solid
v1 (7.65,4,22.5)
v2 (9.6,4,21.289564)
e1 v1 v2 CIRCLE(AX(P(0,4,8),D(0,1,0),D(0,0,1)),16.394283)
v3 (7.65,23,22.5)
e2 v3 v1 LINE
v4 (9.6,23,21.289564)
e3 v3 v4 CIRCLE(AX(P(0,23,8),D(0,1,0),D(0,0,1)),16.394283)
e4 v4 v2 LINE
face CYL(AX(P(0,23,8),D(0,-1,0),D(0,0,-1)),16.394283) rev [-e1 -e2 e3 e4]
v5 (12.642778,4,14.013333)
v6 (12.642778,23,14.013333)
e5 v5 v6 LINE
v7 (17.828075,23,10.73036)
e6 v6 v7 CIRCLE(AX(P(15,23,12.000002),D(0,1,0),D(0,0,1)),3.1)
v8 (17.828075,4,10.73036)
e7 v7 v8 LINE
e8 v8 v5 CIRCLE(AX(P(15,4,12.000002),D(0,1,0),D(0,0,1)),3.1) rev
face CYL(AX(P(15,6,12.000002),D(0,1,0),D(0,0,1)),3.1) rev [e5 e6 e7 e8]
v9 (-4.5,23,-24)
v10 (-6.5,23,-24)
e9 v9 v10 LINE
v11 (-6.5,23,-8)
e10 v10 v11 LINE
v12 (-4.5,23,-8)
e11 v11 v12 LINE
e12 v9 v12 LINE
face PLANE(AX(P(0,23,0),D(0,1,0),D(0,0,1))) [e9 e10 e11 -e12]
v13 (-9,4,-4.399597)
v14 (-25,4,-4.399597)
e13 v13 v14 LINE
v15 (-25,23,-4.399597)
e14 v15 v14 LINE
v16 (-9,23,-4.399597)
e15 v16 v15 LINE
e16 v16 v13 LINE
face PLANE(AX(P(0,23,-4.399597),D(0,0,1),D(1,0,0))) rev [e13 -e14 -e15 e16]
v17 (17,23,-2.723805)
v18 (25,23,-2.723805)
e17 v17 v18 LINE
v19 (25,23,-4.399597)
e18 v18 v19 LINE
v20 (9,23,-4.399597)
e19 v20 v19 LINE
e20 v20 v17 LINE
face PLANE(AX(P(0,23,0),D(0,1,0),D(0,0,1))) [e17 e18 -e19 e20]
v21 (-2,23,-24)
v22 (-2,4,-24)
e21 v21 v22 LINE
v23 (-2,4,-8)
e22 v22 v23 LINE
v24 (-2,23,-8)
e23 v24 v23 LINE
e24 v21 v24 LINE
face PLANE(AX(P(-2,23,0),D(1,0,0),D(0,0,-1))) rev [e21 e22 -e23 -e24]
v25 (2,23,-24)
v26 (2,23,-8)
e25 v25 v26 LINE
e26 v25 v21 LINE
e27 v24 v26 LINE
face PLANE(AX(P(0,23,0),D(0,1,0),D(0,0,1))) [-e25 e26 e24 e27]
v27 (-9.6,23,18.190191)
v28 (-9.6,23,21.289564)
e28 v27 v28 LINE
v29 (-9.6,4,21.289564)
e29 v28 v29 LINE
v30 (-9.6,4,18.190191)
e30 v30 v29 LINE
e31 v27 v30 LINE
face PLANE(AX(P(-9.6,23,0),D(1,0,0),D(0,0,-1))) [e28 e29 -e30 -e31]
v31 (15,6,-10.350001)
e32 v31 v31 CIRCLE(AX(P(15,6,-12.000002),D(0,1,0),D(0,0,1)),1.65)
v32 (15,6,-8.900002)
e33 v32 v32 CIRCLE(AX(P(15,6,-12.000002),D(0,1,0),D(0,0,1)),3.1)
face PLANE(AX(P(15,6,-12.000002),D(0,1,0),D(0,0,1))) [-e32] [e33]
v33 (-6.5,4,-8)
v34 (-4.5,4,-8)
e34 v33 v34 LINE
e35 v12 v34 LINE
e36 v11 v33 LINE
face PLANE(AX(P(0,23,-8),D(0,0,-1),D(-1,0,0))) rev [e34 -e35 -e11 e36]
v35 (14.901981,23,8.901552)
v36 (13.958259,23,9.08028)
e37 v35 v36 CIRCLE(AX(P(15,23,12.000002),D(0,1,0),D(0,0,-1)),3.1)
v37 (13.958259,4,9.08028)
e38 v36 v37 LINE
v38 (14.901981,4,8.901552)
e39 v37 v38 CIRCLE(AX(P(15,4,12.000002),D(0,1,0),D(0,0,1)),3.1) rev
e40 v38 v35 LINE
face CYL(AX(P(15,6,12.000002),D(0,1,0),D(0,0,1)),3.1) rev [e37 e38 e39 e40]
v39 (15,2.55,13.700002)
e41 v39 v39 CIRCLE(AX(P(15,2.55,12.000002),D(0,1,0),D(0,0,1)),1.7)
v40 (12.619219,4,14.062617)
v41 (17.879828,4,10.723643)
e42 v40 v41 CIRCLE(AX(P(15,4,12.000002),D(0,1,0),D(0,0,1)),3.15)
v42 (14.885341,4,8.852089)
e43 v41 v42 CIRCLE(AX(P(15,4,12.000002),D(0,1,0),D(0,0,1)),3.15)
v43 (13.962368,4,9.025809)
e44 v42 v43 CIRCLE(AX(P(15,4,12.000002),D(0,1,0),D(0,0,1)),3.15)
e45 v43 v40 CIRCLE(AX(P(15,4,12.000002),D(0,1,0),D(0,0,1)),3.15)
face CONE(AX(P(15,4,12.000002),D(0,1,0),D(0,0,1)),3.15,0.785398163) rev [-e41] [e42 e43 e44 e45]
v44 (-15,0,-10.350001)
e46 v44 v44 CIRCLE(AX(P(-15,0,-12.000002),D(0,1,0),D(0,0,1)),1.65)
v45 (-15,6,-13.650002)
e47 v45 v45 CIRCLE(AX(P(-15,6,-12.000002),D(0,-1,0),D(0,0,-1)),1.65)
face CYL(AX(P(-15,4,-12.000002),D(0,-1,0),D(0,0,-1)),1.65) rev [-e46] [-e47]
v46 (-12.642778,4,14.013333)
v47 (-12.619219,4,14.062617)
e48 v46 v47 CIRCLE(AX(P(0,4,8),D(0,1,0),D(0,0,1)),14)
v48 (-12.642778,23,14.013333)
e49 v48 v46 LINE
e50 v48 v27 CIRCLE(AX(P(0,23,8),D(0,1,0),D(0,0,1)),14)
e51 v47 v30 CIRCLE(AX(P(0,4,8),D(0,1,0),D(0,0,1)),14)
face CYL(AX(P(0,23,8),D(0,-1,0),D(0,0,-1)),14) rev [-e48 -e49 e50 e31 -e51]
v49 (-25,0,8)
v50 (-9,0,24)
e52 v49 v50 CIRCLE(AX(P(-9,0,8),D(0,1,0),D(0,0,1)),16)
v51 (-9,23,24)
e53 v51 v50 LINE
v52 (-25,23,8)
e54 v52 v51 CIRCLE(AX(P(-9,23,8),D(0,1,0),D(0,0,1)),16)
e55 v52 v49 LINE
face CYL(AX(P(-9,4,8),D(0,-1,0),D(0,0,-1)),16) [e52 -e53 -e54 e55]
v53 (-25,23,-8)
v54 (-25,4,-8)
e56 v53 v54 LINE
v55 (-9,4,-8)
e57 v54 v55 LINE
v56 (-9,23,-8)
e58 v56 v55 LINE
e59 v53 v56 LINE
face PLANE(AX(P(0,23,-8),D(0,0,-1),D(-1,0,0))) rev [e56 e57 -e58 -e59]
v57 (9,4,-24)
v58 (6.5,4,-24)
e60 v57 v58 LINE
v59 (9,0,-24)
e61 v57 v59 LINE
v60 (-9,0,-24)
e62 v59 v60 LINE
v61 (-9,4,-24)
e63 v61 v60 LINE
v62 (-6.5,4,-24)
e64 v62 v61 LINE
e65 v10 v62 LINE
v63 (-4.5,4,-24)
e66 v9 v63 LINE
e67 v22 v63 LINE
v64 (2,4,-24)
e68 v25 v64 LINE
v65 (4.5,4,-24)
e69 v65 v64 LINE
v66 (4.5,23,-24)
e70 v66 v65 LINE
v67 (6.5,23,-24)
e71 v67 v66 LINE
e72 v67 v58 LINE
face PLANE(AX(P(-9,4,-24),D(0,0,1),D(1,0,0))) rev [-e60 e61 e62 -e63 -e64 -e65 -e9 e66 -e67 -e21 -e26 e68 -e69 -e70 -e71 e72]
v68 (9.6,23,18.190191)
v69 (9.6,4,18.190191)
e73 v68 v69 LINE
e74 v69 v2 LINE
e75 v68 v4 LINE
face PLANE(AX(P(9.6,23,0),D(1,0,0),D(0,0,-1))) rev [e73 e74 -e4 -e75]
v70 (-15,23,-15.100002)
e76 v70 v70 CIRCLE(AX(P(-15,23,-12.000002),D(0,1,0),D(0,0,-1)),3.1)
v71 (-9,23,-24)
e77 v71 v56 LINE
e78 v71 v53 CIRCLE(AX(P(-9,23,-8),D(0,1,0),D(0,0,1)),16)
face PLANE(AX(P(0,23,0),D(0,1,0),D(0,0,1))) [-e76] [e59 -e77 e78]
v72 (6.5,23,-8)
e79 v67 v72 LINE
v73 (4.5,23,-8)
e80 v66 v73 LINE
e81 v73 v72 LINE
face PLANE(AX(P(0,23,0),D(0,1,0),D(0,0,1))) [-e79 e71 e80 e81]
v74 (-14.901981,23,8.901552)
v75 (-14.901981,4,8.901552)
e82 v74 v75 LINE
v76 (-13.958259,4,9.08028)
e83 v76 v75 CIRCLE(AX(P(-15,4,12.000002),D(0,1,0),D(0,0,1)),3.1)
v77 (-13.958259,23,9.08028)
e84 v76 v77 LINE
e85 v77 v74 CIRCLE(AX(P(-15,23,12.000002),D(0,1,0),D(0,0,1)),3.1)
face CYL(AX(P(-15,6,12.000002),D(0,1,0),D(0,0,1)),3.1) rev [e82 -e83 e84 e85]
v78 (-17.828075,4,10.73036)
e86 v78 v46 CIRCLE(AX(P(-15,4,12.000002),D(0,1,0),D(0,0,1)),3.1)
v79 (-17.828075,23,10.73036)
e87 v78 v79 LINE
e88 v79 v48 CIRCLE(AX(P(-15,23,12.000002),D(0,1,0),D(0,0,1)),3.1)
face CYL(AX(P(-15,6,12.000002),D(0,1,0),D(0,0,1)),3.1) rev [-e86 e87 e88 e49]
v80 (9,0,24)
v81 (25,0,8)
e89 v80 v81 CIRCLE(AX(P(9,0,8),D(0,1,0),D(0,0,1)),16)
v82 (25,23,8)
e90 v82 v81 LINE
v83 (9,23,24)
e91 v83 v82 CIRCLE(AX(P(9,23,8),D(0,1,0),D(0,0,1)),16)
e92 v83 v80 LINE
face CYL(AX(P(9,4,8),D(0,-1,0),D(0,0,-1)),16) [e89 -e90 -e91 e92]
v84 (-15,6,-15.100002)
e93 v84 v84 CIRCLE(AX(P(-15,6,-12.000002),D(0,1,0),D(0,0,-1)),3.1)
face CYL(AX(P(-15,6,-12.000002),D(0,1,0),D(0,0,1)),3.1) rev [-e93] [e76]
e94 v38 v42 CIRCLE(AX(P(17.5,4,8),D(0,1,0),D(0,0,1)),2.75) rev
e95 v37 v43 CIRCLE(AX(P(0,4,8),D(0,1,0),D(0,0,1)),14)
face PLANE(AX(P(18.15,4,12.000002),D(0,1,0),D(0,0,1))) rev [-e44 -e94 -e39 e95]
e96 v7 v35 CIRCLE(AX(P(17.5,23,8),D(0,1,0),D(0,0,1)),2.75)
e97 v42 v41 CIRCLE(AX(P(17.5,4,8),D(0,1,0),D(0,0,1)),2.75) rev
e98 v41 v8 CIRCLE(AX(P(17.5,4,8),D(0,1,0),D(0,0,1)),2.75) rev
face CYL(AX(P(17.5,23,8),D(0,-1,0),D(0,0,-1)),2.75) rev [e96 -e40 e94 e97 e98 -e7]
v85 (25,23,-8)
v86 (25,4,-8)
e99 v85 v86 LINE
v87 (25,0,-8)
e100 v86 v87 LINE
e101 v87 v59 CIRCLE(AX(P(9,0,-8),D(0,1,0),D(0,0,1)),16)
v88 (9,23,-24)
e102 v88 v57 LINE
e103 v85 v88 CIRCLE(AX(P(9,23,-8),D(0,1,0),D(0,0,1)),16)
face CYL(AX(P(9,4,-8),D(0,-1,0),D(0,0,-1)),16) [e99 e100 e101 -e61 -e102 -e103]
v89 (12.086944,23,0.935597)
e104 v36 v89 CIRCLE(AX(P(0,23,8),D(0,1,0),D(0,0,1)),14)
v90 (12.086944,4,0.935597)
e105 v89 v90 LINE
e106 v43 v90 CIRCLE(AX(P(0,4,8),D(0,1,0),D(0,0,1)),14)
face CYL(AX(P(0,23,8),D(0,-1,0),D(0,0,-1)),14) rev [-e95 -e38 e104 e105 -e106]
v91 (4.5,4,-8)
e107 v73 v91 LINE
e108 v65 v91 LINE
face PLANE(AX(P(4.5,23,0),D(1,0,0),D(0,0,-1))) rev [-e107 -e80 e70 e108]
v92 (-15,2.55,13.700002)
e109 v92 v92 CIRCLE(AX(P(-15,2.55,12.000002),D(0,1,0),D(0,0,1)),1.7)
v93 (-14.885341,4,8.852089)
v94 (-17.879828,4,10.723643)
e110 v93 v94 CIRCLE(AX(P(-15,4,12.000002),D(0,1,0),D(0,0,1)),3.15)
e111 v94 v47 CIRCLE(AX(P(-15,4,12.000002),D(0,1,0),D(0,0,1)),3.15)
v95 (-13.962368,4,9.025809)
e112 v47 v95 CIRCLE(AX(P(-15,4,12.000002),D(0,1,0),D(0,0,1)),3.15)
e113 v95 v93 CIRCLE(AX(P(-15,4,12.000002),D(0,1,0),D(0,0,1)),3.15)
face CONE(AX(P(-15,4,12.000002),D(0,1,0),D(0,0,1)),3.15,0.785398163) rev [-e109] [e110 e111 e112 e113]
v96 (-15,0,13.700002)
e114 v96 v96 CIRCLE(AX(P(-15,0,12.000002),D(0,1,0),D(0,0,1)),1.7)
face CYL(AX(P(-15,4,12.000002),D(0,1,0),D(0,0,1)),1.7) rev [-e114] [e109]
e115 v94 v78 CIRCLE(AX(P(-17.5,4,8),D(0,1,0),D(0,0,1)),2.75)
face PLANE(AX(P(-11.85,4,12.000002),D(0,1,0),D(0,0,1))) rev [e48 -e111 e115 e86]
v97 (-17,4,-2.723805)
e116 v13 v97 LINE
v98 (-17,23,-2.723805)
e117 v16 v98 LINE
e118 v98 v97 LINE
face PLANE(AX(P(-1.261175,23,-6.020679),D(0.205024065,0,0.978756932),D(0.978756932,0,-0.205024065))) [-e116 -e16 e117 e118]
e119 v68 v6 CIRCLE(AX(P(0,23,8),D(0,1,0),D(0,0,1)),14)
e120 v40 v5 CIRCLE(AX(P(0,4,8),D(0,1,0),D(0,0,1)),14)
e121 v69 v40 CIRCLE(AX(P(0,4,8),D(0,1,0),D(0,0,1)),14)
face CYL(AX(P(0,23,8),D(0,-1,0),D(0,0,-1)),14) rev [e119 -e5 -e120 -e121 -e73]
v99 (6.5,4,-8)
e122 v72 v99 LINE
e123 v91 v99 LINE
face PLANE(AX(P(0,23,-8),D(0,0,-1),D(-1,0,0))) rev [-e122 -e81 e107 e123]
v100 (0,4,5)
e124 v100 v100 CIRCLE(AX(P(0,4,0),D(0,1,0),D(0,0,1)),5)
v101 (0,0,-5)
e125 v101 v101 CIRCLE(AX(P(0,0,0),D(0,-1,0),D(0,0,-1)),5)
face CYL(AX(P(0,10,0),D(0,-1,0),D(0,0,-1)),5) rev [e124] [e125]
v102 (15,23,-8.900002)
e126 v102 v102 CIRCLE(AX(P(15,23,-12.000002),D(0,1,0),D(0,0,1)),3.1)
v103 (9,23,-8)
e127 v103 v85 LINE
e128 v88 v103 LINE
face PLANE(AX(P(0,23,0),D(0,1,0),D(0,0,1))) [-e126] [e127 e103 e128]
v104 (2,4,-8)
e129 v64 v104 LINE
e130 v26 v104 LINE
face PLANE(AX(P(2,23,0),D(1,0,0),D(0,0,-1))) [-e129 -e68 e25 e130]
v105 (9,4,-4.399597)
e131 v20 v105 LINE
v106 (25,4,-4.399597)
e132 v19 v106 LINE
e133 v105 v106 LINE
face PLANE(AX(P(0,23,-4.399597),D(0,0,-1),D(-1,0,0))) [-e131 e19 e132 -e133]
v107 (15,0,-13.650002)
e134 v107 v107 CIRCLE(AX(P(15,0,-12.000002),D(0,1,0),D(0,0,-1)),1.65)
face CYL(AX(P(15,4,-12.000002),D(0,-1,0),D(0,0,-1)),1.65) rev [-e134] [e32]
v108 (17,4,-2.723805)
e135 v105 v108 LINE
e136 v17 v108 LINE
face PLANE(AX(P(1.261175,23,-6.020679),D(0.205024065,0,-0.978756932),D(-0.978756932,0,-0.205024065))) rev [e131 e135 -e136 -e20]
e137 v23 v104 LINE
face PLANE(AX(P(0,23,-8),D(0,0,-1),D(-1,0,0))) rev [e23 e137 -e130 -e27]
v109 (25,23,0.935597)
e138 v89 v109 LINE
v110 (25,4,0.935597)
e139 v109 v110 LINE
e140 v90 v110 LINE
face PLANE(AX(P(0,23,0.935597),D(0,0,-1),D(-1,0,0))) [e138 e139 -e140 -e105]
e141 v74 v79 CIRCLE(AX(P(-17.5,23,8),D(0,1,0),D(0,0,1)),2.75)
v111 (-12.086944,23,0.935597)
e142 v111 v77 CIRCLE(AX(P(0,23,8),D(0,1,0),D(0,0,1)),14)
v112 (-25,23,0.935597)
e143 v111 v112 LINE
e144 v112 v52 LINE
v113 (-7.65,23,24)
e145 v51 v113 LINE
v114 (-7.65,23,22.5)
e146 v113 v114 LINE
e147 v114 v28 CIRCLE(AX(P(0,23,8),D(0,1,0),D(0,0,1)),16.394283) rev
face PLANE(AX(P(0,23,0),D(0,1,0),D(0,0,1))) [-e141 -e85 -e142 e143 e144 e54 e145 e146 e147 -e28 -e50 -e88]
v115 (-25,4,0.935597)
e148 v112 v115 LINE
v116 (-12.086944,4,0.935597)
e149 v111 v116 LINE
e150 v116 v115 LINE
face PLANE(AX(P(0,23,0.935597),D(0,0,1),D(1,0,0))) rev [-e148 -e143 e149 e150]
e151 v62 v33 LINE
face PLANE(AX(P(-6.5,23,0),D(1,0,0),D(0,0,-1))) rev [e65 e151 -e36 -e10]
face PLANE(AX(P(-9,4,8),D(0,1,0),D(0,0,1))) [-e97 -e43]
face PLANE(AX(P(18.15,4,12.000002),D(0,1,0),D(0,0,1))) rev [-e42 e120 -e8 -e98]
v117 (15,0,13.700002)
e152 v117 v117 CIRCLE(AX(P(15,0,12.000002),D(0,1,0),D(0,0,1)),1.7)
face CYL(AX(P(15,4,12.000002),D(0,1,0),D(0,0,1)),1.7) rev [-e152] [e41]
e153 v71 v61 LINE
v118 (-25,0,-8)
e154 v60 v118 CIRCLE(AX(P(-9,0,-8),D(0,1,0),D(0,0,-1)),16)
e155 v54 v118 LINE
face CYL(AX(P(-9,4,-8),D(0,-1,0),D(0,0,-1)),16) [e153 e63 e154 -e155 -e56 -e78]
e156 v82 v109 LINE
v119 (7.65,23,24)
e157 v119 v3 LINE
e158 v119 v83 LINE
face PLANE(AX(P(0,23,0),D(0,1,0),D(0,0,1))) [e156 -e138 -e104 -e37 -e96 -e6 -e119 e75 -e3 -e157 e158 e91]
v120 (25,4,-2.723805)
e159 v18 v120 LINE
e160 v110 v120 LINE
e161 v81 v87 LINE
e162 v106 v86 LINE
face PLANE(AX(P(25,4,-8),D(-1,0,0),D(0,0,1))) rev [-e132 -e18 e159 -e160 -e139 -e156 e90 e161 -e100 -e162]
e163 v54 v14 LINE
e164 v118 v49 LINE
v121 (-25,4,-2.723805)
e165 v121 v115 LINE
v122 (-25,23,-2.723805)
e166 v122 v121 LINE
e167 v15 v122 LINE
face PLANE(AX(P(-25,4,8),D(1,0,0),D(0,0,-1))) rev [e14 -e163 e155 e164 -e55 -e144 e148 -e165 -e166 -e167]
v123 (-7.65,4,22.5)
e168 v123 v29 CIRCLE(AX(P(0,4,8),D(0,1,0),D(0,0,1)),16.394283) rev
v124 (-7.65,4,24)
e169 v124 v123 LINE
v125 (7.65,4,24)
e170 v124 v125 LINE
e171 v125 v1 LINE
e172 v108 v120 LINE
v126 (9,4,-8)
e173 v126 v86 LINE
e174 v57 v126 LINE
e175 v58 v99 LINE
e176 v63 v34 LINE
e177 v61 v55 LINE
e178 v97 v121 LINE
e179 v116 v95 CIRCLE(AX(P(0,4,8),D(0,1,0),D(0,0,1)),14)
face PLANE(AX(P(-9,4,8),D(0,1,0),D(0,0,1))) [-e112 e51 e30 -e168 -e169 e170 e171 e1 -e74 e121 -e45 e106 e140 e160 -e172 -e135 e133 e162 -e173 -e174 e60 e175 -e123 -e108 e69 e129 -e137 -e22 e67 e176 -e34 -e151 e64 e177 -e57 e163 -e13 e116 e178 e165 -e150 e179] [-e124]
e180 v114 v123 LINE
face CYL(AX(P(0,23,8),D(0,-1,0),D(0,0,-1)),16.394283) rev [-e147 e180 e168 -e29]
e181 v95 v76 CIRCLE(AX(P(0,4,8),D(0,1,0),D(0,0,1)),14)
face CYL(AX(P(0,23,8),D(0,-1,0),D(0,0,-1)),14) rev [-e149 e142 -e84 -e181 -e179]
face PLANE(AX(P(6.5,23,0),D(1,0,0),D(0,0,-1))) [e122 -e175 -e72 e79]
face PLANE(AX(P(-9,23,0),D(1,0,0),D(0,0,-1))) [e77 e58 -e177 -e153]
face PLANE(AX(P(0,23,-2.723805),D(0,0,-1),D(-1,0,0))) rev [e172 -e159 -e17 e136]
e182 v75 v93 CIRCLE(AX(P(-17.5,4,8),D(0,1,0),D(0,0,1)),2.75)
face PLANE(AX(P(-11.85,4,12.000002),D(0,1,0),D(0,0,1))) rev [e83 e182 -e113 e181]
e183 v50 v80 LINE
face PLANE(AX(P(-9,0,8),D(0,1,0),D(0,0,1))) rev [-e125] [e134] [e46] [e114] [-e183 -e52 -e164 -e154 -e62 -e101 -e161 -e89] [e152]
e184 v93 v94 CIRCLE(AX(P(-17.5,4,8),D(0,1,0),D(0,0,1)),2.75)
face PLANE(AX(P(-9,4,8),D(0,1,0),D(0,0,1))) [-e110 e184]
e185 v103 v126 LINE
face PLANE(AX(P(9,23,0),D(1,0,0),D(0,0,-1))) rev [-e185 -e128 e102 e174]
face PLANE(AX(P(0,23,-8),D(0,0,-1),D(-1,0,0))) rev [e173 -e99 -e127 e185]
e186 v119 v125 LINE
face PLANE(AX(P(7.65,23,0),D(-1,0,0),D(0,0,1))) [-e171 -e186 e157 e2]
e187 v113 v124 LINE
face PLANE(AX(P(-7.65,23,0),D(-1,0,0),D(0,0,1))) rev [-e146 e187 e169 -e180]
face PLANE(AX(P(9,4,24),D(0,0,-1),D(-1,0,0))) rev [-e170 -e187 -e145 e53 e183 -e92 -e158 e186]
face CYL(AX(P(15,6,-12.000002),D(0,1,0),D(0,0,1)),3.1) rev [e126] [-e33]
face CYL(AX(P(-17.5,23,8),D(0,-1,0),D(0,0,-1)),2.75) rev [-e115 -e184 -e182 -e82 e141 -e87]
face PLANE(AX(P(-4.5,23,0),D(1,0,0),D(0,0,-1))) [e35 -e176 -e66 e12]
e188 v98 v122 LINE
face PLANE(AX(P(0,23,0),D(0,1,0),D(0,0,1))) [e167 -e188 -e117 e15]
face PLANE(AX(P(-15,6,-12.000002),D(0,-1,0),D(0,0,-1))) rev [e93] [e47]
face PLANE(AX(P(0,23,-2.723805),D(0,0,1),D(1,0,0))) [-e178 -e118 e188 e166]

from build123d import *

# Parameters (mm, degrees)
SKETCH1_R                                    = 1.650000221024274
BOSS_EXTRUDE1_DEPTH                          = 4
BOSS_EXTRUDE2_OUTLINE_R                      = 2.75
BOSS_EXTRUDE2_OUTLINE_R_2                    = 1.650000221
BOSS_EXTRUDE2_OUTLINE_W                      = 2.000000000000001
BOSS_EXTRUDE2_OUTLINE_H                      = 16.000000209
BOSS_EXTRUDE2_OUTLINE_W_2                    = 4
BOSS_EXTRUDE2_DEPTH                          = 19
SKETCH6_R                                    = 3.1000000000000005
SKETCH6_R_2                                  = 3.0999999999999988
CUT_EXTRUDE2_DEPTH                           = 17
SKETCH7_R                                    = 3.1000000000000005
SKETCH7_R_2                                  = 3.0999999999999988
CUT_EXTRUDE3_DEPTH                           = 2
SKETCH11_R                                   = 5
CUT_EXTRUDE4_DEPTH                           = 10
CSK_FOR_M3_CROSS_RECESS_FLAT_HEAD_SC_2_COUNT = 2
CSK_FOR_M3_CROSS_RECESS_FLAT_HEAD_SC_2_PITCH = 29.999999886192118


# Read off the part's stored shape, not the designer's step: Boss-Extrude2
with BuildPart() as part:
    # Sketch1 → Boss-Extrude1 (new body)
    with BuildSketch(Plane(origin=(0, 0, 0), x_dir=(1, 0, 0), z_dir=(0, 1, 0))):
        with BuildLine():
            Line((-9.000000372528914, 24.000000208616257), (9.000000372528918, 24.000000208616257))
            ThreePointArc((9.000000372528918, 24.000000208616257), (20.31370887151379, 19.313708707601016), (25.00000037252903, 8.000000208616145))
            Line((25.00000037252903, 8.000000208616145), (25.00000037252903, -8.000000208616145))
            ThreePointArc((25.00000037252903, -8.000000208616145), (20.31370887151379, -19.313708707601016), (9.000000372528918, -24.000000208616257))
            Line((9.000000372528918, -24.000000208616257), (-9.000000372528914, -24.000000208616257))
            ThreePointArc((-9.000000372528914, -24.000000208616257), (-20.313708871513793, -19.31370870760102), (-25.00000037252903, -8.000000208616145))
            Line((-25.00000037252903, -8.000000208616145), (-25.00000037252903, 8.000000208616145))
            ThreePointArc((-25.00000037252903, 8.000000208616145), (-20.31370887151379, 19.313708707601016), (-9.000000372528914, 24.000000208616257))
        make_face()
        with Locations(Location((-14.999999943096059, 12.000001695688482, 0), (0, 0, 270))):
            Circle(SKETCH1_R, mode=Mode.SUBTRACT)
        with Locations(Location((14.999999943096059, 12.00000169568849, 0), (0, 0, 90))):
            Circle(SKETCH1_R, mode=Mode.SUBTRACT)
        with Locations(Location((14.999999943096059, -12.00000169568849, 0), (0, 0, 270))):
            Circle(SKETCH1_R, mode=Mode.SUBTRACT)
        with Locations(Location((-14.999999943096059, -12.000001695688482, 0), (0, 0, 90))):
            Circle(SKETCH1_R, mode=Mode.SUBTRACT)
    extrude(amount=BOSS_EXTRUDE1_DEPTH)

    # Boss-Extrude2 outline → Boss-Extrude2 (add)
    # profile 1 of 9: a face of its own
    with BuildSketch(Plane(origin=(0, 4, 0), x_dir=(1, 0, 0), z_dir=(0, 1, 0))):
        with BuildLine():
            ThreePointArc((-25.000000373, -8.000000209), (-20.313708872, -19.313708708), (-9.000000373, -24.000000209))
            Line((-9.000000373, -24.000000209), (-7.65, -24.000000209))
            Line((-7.65, -24.000000209), (-7.65, -22.5))
            ThreePointArc((-7.65, -22.5), (-8.646208076, -21.928947768), (-9.6, -21.289563574))
            Line((-9.6, -21.289563574), (-9.6, -18.190191362))
            ThreePointArc((-9.6, -18.190191362), (-11.86645746, -15.428807936), (-13.360259128, -12.183715576))
            ThreePointArc((-13.360259128, -12.183715576), (-16.594287762, -12.425145296), (-13.669460049, -11.024212621))
            ThreePointArc((-13.669460049, -11.024212621), (-13.83087583, -5.830466926), (-12.086943849, -0.935597096))
            Line((-12.086943849, -0.935597096), (-25.000000373, -0.935597096))
            Line((-25.000000373, -0.935597096), (-25.000000373, -8.000000209))
        make_face()
        with Locations((-17.5, -8)):
            Circle(BOSS_EXTRUDE2_OUTLINE_R, mode=Mode.SUBTRACT)
    # profile 2 of 9: a face of its own
    with BuildSketch(Plane(origin=(0, 4, 0), x_dir=(1, 0, 0), z_dir=(0, 1, 0))):
        with BuildLine():
            Line((7.65, -22.5), (7.65, -24.000000209))
            Line((7.65, -24.000000209), (9.000000373, -24.000000209))
            ThreePointArc((9.000000373, -24.000000209), (20.313708872, -19.313708708), (25.000000373, -8.000000209))
            Line((25.000000373, -8.000000209), (25.000000373, -0.935597096))
            Line((25.000000373, -0.935597096), (12.086943849, -0.935597096))
            ThreePointArc((12.086943849, -0.935597096), (13.83087583, -5.830466926), (13.669460049, -11.024212621))
            ThreePointArc((13.669460049, -11.024212621), (16.594287762, -12.425145296), (13.360259128, -12.183715576))
            ThreePointArc((13.360259128, -12.183715576), (11.86645746, -15.428807936), (9.6, -18.190191362))
            Line((9.6, -18.190191362), (9.6, -21.289563574))
            ThreePointArc((9.6, -21.289563574), (8.646208076, -21.928947768), (7.65, -22.5))
        make_face()
        with Locations((17.5, -8)):
            Circle(BOSS_EXTRUDE2_OUTLINE_R, mode=Mode.SUBTRACT)
    # profile 3 of 9: a face of its own
    with BuildSketch(Plane(origin=(0, 4, 0), x_dir=(1, 0, 0), z_dir=(0, 1, 0))):
        Polygon((-25.000000373, 4.399596768), (-25.000000373, 2.723805295), (-17, 2.723805295), (-9, 4.399596768), align=None)
    # profile 4 of 9: a face of its own
    with BuildSketch(Plane(origin=(0, 4, 0), x_dir=(1, 0, 0), z_dir=(0, 1, 0))):
        with BuildLine():
            ThreePointArc((-9.000000373, 24.000000209), (-20.313708872, 19.313708708), (-25.000000373, 8.000000209))
            Line((-25.000000373, 8.000000209), (-9, 8))
            Line((-9, 8), (-9.000000373, 24.000000209))
        make_face()
        with Locations((-14.999999943, 12.000001696)):
            Circle(BOSS_EXTRUDE2_OUTLINE_R_2, mode=Mode.SUBTRACT)
    # profile 5 of 9: a face of its own
    with BuildSketch(Plane(origin=(0, 4, 0), x_dir=(1, 0, 0), z_dir=(0, 1, 0))):
        Polygon((17, 2.723805295), (25.000000373, 2.723805295), (25.000000373, 4.399596768), (9, 4.399596768), align=None)
    # profile 6 of 9: a face of its own
    with BuildSketch(Plane(origin=(0, 4, 0), x_dir=(1, 0, 0), z_dir=(0, 1, 0))):
        with Locations((-5.5, 16.0000001045)):
            Rectangle(BOSS_EXTRUDE2_OUTLINE_W, BOSS_EXTRUDE2_OUTLINE_H)
    # profile 7 of 9: a face of its own
    with BuildSketch(Plane(origin=(0, 4, 0), x_dir=(1, 0, 0), z_dir=(0, 1, 0))):
        with BuildLine():
            Line((9, 8), (25.000000373, 8.000000209))
            ThreePointArc((25.000000373, 8.000000209), (20.313708872, 19.313708708), (9.000000373, 24.000000209))
            Line((9.000000373, 24.000000209), (9, 8))
        make_face()
        with Locations((14.999999943, 12.000001696)):
            Circle(BOSS_EXTRUDE2_OUTLINE_R_2, mode=Mode.SUBTRACT)
    # profile 8 of 9: a face of its own
    with BuildSketch(Plane(origin=(0, 4, 0), x_dir=(1, 0, 0), z_dir=(0, 1, 0))):
        with Locations((0, 16.0000001045)):
            Rectangle(BOSS_EXTRUDE2_OUTLINE_W_2, BOSS_EXTRUDE2_OUTLINE_H)
    # profile 9 of 9: a face of its own
    with BuildSketch(Plane(origin=(0, 4, 0), x_dir=(1, 0, 0), z_dir=(0, 1, 0))):
        with Locations((5.5, 16.0000001045)):
            Rectangle(BOSS_EXTRUDE2_OUTLINE_W, BOSS_EXTRUDE2_OUTLINE_H)
    extrude(amount=BOSS_EXTRUDE2_DEPTH)

    # Sketch6 → Cut-Extrude2 (cut)
    with BuildSketch(Plane(origin=(0, 23, 0), x_dir=(1, 0, 0), z_dir=(0, 1, 0))):
        with Locations((-14.999999943096059, -12.000001695688482)):
            Circle(SKETCH6_R)
        with Locations((14.999999943096062, -12.000001695688479)):
            Circle(SKETCH6_R_2)
        with Locations(Location((14.999999943096059, 12.000001695688482, 0), (0, 0, 270))):
            Circle(SKETCH6_R_2)
        with Locations(Location((-14.999999943096062, 12.000001695688479, 0), (0, 0, 90))):
            Circle(SKETCH6_R)
    extrude(amount=-CUT_EXTRUDE2_DEPTH, mode=Mode.SUBTRACT)

    # Sketch7 → Cut-Extrude3 (cut)
    with BuildSketch(Plane(origin=(0, 5.999999999999998, 0), x_dir=(1, 0, 0), z_dir=(0, 1, 0))):
        with Locations((-14.999999943096059, -12.000001695688482)):
            Circle(SKETCH7_R)
        with Locations((14.999999943096062, -12.000001695688479)):
            Circle(SKETCH7_R_2)
    extrude(amount=-CUT_EXTRUDE3_DEPTH, mode=Mode.SUBTRACT)

    # Sketch11 → Cut-Extrude4 (cut)
    with BuildSketch(Plane.XZ):
        with Locations(Location((0, 0, 0), (0, 0, 270))):
            Circle(SKETCH11_R)
    extrude(amount=-CUT_EXTRUDE4_DEPTH, mode=Mode.SUBTRACT)

    # Sketch10 → CSK for M3 Cross Recess Flat Head Screw1 (revolve, cut)
    with BuildSketch(Plane(origin=(-14.999999943096059, 4, 12.000001695688482), x_dir=(0, 0, 1), z_dir=(1, 0, 0))):
        Polygon((0, 0), (-7.6e-15, 31.021463052346846), (1.6999999999999862, 30), (1.699999999999996, 1.45), (3.15, -1.73e-15), align=None)
    csk_for_m3_cross_recess_flat_head_screw1 = revolve(axis=Axis((-14.999999943096059, 10.34999999999999, 12.000001695688482), (0, -1, 0)), mode=Mode.SUBTRACT)

    # CSK for M3 Cross Recess Flat Head Sc 2: CSK for M3 Cross Recess Flat Head Screw1 ×2
    with Locations(*[(i * CSK_FOR_M3_CROSS_RECESS_FLAT_HEAD_SC_2_PITCH, 0, 0) for i in range(1, CSK_FOR_M3_CROSS_RECESS_FLAT_HEAD_SC_2_COUNT)]):
        add(csk_for_m3_cross_recess_flat_head_screw1, mode=Mode.SUBTRACT)


solid = part.part
